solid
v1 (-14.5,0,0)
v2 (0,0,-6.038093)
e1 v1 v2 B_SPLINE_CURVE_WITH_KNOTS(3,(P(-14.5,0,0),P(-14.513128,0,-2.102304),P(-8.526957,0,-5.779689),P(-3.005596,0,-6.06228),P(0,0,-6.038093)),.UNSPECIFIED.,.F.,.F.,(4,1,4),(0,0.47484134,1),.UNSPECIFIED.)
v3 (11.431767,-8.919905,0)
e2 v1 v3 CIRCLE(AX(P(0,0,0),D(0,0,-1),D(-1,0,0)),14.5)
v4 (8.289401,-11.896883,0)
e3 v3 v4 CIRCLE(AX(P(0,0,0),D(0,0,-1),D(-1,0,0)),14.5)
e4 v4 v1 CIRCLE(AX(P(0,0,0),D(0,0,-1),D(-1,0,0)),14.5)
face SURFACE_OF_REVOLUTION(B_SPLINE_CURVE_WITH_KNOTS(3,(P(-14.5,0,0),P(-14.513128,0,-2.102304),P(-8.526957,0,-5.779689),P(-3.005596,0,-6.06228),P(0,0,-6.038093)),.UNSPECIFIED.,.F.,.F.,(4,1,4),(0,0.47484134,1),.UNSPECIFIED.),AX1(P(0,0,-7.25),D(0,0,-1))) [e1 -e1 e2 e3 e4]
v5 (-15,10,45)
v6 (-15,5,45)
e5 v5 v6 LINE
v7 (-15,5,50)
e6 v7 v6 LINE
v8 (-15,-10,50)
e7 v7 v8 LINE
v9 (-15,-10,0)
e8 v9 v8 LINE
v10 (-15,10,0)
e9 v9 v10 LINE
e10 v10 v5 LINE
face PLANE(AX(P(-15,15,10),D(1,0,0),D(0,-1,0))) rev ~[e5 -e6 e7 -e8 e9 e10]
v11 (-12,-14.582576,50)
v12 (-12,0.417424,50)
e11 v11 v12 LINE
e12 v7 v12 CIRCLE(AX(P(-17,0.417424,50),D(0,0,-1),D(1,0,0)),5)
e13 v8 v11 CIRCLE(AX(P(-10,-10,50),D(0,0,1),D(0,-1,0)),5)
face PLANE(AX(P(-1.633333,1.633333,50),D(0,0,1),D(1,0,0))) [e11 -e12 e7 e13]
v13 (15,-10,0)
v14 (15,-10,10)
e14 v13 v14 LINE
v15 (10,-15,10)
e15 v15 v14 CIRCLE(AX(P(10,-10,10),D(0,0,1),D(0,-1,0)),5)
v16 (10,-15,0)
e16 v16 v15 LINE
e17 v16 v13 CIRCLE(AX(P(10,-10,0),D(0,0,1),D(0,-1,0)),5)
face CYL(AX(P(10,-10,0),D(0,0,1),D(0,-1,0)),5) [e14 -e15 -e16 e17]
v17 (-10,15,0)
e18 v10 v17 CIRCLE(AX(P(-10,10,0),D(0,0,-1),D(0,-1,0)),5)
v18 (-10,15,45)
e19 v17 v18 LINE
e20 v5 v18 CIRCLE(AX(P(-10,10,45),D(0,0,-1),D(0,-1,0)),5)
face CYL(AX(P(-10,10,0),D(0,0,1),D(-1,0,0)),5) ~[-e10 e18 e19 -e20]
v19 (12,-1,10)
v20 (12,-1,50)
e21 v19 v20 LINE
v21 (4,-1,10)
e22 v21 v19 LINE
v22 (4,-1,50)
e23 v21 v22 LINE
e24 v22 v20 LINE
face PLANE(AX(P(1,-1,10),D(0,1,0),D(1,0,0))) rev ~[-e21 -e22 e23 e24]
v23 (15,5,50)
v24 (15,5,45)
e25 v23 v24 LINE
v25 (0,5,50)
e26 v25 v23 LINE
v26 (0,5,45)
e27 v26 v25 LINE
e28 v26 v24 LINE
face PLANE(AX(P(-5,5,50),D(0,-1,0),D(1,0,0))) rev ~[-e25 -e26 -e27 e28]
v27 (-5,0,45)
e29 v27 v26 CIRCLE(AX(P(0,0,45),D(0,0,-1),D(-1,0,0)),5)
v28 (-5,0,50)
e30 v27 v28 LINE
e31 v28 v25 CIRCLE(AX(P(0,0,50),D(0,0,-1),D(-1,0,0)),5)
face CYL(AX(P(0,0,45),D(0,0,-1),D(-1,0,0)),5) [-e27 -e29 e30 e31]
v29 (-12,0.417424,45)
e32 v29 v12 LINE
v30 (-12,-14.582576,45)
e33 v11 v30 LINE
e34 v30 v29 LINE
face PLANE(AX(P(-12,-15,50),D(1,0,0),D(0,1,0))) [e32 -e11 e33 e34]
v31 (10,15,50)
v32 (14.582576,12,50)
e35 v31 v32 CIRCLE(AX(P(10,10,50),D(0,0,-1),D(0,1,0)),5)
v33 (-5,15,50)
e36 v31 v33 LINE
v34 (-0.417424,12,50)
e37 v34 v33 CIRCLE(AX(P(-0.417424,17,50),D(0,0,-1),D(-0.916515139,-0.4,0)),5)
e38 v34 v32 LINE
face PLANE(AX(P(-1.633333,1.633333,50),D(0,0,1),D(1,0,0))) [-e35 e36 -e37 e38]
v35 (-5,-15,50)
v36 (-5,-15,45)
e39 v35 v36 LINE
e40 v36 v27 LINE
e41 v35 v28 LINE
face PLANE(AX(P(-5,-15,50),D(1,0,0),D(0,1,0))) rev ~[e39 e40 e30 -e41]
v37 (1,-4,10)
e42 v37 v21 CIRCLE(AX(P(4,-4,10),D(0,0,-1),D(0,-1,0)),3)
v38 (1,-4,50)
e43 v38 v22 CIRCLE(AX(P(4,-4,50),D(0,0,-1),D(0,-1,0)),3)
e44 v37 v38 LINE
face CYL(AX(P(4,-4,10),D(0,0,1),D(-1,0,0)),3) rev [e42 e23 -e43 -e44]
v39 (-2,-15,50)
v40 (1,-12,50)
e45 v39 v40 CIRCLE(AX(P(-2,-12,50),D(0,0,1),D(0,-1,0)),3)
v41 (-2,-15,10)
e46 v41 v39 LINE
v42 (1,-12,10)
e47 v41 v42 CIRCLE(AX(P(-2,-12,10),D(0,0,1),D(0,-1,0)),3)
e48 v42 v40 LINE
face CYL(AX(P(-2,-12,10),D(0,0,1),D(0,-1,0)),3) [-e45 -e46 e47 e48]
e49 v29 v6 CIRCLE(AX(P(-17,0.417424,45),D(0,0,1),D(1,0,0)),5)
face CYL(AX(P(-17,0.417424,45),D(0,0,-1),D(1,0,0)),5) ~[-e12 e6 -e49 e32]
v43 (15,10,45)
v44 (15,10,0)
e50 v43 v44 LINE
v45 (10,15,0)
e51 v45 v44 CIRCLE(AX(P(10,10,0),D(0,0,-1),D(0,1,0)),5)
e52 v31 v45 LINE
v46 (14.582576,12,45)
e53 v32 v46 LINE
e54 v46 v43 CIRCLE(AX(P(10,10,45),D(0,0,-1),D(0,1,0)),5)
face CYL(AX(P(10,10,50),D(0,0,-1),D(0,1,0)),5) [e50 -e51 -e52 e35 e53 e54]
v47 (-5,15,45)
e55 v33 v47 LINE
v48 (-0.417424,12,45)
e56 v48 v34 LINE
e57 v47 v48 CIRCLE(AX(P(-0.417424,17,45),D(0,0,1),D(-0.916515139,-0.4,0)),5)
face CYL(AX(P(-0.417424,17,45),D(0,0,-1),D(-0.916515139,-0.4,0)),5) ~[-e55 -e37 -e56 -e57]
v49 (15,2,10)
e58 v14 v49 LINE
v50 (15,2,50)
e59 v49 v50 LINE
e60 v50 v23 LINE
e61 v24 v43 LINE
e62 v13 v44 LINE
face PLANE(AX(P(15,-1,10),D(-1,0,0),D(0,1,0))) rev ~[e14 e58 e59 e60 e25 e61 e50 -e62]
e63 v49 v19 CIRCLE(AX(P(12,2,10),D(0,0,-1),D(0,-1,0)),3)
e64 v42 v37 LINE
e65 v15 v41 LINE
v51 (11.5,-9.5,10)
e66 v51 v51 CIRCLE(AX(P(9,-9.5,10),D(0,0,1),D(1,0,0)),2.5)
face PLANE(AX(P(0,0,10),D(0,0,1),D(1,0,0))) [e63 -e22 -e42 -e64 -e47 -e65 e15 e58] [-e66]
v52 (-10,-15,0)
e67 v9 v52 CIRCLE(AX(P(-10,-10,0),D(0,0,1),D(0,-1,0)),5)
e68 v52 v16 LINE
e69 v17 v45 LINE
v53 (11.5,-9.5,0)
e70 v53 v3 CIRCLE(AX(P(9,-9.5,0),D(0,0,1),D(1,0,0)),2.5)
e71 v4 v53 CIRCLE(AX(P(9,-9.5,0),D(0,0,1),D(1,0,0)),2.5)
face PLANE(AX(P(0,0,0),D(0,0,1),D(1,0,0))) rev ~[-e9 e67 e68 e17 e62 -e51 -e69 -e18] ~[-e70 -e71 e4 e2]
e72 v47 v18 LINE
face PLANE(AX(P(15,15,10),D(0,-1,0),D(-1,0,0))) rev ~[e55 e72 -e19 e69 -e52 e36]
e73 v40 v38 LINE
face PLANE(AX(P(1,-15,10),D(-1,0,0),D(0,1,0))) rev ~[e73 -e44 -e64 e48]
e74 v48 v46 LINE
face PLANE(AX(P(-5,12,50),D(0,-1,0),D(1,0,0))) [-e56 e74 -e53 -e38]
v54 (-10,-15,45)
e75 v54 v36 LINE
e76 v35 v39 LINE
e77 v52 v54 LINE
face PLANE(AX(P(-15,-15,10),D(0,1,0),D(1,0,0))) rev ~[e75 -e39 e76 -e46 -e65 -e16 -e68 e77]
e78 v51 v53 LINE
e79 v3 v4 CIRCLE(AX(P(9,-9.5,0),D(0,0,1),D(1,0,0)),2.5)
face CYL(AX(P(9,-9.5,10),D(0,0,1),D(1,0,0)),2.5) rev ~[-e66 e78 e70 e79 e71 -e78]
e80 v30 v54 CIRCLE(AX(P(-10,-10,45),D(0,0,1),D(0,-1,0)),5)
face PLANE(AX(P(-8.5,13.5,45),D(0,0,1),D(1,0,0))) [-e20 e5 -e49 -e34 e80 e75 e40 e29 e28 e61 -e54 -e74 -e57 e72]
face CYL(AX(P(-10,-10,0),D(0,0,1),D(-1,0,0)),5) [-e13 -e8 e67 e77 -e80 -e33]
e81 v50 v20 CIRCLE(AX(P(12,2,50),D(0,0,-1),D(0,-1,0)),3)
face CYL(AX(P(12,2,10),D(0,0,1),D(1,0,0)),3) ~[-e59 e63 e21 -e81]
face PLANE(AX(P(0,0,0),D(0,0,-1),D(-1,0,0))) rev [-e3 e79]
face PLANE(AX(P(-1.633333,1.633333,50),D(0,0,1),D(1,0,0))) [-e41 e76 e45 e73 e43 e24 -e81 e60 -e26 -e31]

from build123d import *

# Parameters (mm, degrees)
F0_W         = 30
F0_H         = 30
F1_DEPTH     = 10
F3_DEPTH     = 40
F4_W         = 7
F4_H         = 3
F4_W_2       = 3
F4_H_2       = 7
F4_H_3       = 20
F4_W_3       = 20
F5_DEPTH     = 5
F6_R         = 2.5
F7_DEPTH     = 10
F10_R        = 5
F11_T1_DEPTH = 17.5
F11_T3_DEPTH = 16.4564392374
F12_R        = 3


# Not quite as in the source:
# - a fillet or chamfer that OpenCascade refuses, or shapes differently, is made with other operations: its cross-section is extruded or revolved along the edge and cut away or added


with BuildPart() as f1:
    # F0 (on Top) → F1 (new body)
    with BuildSketch(Plane.XY):
        Rectangle(F0_W, F0_H)
    extrude(amount=F1_DEPTH)

    # F2 (on face) → F3 (join)
    with BuildSketch(Plane.XY.offset(10)):
        Polygon((15, 15), (-15, 15), (-15, -15), (1, -15), (1, -1), (15, -1), align=None)
    extrude(amount=F3_DEPTH)

    # F4 (on face) → F5 (cut)
    with BuildSketch(Plane.XY.offset(50)):
        with Locations((-8.5, 13.5)):
            Rectangle(F4_W, F4_H)
        with Locations((-13.5, 13.5)):
            Rectangle(F4_W_2, F4_H)
        with Locations((-8.5, 8.5)):
            Rectangle(F4_W, F4_H_2)
        with Locations((-13.5, 8.5)):
            Rectangle(F4_W_2, F4_H_2)
        with Locations((-8.5, -5)):
            Rectangle(F4_W, F4_H_3)
        with Locations((5, 8.5)):
            Rectangle(F4_W_3, F4_H_2)
    extrude(amount=-F5_DEPTH, mode=Mode.SUBTRACT)

    # F6 (on face) → F7 (cut, through all)
    with BuildSketch(Plane.XY.offset(10)):
        with Locations((9, -9.5)):
            Circle(F6_R)
    extrude(amount=-F7_DEPTH, mode=Mode.SUBTRACT)

    # F8 (on Front) → F9 (revolve)
    with BuildSketch(Plane.XZ):
        with BuildLine():
            Line((0, 0), (-14.5, 0))
            add(Edge.make_bspline(
                [(-14.5, 0), (-14.5131281167, -2.1023036255), (-8.5269566385, -5.7796890584), (-3.0055961106, -6.062279921), (0, -6.0380934738)],
                knots=[0, 0, 0, 0, 0.4748413397, 1, 1, 1, 1], degree=3))
            Line((0, -6.0380934738), (0, 0))
        make_face()
    revolve(axis=Axis((0, 0, -7.25), (0, 0, -1)))

    # F10
    f10_edges = [f1.edges().sort_by_distance(p)[0] for p in [
        (-15, -15, 25),
        (15, -15, 5),
        (-15, 15, 22.5),
        (15, 15, 25),
    ]]
    fillet(f10_edges, radius=F10_R)

    # F11: fillet of radius 5 on 3 edges, made by hand

    # F11_s2 → F11_t1 (cut)
    with BuildSketch(Plane.XY.offset(45)):
        with BuildLine():
            ThreePointArc((-5, 0), (-3.5355339059, 3.5355339059), (0, 5))
            Line((0, 5), (-5, 5))
            Line((-5, 5), (-5, 0))
        make_face()
    extrude(amount=F11_T1_DEPTH, mode=Mode.SUBTRACT)

    # F11_s4 → F11_t3 (cut)
    with BuildSketch(Plane.XY.offset(45)):
        with BuildLine():
            ThreePointArc((-5, 15), (-3.1560370926, 12.8166998673), (-0.417424305, 12))
            Line((-0.417424305, 12), (-5, 12))
            Line((-5, 12), (-5, 15))
        make_face()
        with BuildLine():
            ThreePointArc((-12, 0.417424305), (-12.8166998673, 3.1560370926), (-15, 5))
            Line((-15, 5), (-12, 5))
            Line((-12, 5), (-12, 0.417424305))
        make_face()
    extrude(amount=F11_T3_DEPTH, mode=Mode.SUBTRACT)

    # F12
    f12_edges = [f1.edges().sort_by_distance(p)[0] for p in [
        (1, -1, 30),
        (1, -15, 30),
        (15, -1, 30),
    ]]
    fillet(f12_edges, radius=F12_R)


solid = f1.part
